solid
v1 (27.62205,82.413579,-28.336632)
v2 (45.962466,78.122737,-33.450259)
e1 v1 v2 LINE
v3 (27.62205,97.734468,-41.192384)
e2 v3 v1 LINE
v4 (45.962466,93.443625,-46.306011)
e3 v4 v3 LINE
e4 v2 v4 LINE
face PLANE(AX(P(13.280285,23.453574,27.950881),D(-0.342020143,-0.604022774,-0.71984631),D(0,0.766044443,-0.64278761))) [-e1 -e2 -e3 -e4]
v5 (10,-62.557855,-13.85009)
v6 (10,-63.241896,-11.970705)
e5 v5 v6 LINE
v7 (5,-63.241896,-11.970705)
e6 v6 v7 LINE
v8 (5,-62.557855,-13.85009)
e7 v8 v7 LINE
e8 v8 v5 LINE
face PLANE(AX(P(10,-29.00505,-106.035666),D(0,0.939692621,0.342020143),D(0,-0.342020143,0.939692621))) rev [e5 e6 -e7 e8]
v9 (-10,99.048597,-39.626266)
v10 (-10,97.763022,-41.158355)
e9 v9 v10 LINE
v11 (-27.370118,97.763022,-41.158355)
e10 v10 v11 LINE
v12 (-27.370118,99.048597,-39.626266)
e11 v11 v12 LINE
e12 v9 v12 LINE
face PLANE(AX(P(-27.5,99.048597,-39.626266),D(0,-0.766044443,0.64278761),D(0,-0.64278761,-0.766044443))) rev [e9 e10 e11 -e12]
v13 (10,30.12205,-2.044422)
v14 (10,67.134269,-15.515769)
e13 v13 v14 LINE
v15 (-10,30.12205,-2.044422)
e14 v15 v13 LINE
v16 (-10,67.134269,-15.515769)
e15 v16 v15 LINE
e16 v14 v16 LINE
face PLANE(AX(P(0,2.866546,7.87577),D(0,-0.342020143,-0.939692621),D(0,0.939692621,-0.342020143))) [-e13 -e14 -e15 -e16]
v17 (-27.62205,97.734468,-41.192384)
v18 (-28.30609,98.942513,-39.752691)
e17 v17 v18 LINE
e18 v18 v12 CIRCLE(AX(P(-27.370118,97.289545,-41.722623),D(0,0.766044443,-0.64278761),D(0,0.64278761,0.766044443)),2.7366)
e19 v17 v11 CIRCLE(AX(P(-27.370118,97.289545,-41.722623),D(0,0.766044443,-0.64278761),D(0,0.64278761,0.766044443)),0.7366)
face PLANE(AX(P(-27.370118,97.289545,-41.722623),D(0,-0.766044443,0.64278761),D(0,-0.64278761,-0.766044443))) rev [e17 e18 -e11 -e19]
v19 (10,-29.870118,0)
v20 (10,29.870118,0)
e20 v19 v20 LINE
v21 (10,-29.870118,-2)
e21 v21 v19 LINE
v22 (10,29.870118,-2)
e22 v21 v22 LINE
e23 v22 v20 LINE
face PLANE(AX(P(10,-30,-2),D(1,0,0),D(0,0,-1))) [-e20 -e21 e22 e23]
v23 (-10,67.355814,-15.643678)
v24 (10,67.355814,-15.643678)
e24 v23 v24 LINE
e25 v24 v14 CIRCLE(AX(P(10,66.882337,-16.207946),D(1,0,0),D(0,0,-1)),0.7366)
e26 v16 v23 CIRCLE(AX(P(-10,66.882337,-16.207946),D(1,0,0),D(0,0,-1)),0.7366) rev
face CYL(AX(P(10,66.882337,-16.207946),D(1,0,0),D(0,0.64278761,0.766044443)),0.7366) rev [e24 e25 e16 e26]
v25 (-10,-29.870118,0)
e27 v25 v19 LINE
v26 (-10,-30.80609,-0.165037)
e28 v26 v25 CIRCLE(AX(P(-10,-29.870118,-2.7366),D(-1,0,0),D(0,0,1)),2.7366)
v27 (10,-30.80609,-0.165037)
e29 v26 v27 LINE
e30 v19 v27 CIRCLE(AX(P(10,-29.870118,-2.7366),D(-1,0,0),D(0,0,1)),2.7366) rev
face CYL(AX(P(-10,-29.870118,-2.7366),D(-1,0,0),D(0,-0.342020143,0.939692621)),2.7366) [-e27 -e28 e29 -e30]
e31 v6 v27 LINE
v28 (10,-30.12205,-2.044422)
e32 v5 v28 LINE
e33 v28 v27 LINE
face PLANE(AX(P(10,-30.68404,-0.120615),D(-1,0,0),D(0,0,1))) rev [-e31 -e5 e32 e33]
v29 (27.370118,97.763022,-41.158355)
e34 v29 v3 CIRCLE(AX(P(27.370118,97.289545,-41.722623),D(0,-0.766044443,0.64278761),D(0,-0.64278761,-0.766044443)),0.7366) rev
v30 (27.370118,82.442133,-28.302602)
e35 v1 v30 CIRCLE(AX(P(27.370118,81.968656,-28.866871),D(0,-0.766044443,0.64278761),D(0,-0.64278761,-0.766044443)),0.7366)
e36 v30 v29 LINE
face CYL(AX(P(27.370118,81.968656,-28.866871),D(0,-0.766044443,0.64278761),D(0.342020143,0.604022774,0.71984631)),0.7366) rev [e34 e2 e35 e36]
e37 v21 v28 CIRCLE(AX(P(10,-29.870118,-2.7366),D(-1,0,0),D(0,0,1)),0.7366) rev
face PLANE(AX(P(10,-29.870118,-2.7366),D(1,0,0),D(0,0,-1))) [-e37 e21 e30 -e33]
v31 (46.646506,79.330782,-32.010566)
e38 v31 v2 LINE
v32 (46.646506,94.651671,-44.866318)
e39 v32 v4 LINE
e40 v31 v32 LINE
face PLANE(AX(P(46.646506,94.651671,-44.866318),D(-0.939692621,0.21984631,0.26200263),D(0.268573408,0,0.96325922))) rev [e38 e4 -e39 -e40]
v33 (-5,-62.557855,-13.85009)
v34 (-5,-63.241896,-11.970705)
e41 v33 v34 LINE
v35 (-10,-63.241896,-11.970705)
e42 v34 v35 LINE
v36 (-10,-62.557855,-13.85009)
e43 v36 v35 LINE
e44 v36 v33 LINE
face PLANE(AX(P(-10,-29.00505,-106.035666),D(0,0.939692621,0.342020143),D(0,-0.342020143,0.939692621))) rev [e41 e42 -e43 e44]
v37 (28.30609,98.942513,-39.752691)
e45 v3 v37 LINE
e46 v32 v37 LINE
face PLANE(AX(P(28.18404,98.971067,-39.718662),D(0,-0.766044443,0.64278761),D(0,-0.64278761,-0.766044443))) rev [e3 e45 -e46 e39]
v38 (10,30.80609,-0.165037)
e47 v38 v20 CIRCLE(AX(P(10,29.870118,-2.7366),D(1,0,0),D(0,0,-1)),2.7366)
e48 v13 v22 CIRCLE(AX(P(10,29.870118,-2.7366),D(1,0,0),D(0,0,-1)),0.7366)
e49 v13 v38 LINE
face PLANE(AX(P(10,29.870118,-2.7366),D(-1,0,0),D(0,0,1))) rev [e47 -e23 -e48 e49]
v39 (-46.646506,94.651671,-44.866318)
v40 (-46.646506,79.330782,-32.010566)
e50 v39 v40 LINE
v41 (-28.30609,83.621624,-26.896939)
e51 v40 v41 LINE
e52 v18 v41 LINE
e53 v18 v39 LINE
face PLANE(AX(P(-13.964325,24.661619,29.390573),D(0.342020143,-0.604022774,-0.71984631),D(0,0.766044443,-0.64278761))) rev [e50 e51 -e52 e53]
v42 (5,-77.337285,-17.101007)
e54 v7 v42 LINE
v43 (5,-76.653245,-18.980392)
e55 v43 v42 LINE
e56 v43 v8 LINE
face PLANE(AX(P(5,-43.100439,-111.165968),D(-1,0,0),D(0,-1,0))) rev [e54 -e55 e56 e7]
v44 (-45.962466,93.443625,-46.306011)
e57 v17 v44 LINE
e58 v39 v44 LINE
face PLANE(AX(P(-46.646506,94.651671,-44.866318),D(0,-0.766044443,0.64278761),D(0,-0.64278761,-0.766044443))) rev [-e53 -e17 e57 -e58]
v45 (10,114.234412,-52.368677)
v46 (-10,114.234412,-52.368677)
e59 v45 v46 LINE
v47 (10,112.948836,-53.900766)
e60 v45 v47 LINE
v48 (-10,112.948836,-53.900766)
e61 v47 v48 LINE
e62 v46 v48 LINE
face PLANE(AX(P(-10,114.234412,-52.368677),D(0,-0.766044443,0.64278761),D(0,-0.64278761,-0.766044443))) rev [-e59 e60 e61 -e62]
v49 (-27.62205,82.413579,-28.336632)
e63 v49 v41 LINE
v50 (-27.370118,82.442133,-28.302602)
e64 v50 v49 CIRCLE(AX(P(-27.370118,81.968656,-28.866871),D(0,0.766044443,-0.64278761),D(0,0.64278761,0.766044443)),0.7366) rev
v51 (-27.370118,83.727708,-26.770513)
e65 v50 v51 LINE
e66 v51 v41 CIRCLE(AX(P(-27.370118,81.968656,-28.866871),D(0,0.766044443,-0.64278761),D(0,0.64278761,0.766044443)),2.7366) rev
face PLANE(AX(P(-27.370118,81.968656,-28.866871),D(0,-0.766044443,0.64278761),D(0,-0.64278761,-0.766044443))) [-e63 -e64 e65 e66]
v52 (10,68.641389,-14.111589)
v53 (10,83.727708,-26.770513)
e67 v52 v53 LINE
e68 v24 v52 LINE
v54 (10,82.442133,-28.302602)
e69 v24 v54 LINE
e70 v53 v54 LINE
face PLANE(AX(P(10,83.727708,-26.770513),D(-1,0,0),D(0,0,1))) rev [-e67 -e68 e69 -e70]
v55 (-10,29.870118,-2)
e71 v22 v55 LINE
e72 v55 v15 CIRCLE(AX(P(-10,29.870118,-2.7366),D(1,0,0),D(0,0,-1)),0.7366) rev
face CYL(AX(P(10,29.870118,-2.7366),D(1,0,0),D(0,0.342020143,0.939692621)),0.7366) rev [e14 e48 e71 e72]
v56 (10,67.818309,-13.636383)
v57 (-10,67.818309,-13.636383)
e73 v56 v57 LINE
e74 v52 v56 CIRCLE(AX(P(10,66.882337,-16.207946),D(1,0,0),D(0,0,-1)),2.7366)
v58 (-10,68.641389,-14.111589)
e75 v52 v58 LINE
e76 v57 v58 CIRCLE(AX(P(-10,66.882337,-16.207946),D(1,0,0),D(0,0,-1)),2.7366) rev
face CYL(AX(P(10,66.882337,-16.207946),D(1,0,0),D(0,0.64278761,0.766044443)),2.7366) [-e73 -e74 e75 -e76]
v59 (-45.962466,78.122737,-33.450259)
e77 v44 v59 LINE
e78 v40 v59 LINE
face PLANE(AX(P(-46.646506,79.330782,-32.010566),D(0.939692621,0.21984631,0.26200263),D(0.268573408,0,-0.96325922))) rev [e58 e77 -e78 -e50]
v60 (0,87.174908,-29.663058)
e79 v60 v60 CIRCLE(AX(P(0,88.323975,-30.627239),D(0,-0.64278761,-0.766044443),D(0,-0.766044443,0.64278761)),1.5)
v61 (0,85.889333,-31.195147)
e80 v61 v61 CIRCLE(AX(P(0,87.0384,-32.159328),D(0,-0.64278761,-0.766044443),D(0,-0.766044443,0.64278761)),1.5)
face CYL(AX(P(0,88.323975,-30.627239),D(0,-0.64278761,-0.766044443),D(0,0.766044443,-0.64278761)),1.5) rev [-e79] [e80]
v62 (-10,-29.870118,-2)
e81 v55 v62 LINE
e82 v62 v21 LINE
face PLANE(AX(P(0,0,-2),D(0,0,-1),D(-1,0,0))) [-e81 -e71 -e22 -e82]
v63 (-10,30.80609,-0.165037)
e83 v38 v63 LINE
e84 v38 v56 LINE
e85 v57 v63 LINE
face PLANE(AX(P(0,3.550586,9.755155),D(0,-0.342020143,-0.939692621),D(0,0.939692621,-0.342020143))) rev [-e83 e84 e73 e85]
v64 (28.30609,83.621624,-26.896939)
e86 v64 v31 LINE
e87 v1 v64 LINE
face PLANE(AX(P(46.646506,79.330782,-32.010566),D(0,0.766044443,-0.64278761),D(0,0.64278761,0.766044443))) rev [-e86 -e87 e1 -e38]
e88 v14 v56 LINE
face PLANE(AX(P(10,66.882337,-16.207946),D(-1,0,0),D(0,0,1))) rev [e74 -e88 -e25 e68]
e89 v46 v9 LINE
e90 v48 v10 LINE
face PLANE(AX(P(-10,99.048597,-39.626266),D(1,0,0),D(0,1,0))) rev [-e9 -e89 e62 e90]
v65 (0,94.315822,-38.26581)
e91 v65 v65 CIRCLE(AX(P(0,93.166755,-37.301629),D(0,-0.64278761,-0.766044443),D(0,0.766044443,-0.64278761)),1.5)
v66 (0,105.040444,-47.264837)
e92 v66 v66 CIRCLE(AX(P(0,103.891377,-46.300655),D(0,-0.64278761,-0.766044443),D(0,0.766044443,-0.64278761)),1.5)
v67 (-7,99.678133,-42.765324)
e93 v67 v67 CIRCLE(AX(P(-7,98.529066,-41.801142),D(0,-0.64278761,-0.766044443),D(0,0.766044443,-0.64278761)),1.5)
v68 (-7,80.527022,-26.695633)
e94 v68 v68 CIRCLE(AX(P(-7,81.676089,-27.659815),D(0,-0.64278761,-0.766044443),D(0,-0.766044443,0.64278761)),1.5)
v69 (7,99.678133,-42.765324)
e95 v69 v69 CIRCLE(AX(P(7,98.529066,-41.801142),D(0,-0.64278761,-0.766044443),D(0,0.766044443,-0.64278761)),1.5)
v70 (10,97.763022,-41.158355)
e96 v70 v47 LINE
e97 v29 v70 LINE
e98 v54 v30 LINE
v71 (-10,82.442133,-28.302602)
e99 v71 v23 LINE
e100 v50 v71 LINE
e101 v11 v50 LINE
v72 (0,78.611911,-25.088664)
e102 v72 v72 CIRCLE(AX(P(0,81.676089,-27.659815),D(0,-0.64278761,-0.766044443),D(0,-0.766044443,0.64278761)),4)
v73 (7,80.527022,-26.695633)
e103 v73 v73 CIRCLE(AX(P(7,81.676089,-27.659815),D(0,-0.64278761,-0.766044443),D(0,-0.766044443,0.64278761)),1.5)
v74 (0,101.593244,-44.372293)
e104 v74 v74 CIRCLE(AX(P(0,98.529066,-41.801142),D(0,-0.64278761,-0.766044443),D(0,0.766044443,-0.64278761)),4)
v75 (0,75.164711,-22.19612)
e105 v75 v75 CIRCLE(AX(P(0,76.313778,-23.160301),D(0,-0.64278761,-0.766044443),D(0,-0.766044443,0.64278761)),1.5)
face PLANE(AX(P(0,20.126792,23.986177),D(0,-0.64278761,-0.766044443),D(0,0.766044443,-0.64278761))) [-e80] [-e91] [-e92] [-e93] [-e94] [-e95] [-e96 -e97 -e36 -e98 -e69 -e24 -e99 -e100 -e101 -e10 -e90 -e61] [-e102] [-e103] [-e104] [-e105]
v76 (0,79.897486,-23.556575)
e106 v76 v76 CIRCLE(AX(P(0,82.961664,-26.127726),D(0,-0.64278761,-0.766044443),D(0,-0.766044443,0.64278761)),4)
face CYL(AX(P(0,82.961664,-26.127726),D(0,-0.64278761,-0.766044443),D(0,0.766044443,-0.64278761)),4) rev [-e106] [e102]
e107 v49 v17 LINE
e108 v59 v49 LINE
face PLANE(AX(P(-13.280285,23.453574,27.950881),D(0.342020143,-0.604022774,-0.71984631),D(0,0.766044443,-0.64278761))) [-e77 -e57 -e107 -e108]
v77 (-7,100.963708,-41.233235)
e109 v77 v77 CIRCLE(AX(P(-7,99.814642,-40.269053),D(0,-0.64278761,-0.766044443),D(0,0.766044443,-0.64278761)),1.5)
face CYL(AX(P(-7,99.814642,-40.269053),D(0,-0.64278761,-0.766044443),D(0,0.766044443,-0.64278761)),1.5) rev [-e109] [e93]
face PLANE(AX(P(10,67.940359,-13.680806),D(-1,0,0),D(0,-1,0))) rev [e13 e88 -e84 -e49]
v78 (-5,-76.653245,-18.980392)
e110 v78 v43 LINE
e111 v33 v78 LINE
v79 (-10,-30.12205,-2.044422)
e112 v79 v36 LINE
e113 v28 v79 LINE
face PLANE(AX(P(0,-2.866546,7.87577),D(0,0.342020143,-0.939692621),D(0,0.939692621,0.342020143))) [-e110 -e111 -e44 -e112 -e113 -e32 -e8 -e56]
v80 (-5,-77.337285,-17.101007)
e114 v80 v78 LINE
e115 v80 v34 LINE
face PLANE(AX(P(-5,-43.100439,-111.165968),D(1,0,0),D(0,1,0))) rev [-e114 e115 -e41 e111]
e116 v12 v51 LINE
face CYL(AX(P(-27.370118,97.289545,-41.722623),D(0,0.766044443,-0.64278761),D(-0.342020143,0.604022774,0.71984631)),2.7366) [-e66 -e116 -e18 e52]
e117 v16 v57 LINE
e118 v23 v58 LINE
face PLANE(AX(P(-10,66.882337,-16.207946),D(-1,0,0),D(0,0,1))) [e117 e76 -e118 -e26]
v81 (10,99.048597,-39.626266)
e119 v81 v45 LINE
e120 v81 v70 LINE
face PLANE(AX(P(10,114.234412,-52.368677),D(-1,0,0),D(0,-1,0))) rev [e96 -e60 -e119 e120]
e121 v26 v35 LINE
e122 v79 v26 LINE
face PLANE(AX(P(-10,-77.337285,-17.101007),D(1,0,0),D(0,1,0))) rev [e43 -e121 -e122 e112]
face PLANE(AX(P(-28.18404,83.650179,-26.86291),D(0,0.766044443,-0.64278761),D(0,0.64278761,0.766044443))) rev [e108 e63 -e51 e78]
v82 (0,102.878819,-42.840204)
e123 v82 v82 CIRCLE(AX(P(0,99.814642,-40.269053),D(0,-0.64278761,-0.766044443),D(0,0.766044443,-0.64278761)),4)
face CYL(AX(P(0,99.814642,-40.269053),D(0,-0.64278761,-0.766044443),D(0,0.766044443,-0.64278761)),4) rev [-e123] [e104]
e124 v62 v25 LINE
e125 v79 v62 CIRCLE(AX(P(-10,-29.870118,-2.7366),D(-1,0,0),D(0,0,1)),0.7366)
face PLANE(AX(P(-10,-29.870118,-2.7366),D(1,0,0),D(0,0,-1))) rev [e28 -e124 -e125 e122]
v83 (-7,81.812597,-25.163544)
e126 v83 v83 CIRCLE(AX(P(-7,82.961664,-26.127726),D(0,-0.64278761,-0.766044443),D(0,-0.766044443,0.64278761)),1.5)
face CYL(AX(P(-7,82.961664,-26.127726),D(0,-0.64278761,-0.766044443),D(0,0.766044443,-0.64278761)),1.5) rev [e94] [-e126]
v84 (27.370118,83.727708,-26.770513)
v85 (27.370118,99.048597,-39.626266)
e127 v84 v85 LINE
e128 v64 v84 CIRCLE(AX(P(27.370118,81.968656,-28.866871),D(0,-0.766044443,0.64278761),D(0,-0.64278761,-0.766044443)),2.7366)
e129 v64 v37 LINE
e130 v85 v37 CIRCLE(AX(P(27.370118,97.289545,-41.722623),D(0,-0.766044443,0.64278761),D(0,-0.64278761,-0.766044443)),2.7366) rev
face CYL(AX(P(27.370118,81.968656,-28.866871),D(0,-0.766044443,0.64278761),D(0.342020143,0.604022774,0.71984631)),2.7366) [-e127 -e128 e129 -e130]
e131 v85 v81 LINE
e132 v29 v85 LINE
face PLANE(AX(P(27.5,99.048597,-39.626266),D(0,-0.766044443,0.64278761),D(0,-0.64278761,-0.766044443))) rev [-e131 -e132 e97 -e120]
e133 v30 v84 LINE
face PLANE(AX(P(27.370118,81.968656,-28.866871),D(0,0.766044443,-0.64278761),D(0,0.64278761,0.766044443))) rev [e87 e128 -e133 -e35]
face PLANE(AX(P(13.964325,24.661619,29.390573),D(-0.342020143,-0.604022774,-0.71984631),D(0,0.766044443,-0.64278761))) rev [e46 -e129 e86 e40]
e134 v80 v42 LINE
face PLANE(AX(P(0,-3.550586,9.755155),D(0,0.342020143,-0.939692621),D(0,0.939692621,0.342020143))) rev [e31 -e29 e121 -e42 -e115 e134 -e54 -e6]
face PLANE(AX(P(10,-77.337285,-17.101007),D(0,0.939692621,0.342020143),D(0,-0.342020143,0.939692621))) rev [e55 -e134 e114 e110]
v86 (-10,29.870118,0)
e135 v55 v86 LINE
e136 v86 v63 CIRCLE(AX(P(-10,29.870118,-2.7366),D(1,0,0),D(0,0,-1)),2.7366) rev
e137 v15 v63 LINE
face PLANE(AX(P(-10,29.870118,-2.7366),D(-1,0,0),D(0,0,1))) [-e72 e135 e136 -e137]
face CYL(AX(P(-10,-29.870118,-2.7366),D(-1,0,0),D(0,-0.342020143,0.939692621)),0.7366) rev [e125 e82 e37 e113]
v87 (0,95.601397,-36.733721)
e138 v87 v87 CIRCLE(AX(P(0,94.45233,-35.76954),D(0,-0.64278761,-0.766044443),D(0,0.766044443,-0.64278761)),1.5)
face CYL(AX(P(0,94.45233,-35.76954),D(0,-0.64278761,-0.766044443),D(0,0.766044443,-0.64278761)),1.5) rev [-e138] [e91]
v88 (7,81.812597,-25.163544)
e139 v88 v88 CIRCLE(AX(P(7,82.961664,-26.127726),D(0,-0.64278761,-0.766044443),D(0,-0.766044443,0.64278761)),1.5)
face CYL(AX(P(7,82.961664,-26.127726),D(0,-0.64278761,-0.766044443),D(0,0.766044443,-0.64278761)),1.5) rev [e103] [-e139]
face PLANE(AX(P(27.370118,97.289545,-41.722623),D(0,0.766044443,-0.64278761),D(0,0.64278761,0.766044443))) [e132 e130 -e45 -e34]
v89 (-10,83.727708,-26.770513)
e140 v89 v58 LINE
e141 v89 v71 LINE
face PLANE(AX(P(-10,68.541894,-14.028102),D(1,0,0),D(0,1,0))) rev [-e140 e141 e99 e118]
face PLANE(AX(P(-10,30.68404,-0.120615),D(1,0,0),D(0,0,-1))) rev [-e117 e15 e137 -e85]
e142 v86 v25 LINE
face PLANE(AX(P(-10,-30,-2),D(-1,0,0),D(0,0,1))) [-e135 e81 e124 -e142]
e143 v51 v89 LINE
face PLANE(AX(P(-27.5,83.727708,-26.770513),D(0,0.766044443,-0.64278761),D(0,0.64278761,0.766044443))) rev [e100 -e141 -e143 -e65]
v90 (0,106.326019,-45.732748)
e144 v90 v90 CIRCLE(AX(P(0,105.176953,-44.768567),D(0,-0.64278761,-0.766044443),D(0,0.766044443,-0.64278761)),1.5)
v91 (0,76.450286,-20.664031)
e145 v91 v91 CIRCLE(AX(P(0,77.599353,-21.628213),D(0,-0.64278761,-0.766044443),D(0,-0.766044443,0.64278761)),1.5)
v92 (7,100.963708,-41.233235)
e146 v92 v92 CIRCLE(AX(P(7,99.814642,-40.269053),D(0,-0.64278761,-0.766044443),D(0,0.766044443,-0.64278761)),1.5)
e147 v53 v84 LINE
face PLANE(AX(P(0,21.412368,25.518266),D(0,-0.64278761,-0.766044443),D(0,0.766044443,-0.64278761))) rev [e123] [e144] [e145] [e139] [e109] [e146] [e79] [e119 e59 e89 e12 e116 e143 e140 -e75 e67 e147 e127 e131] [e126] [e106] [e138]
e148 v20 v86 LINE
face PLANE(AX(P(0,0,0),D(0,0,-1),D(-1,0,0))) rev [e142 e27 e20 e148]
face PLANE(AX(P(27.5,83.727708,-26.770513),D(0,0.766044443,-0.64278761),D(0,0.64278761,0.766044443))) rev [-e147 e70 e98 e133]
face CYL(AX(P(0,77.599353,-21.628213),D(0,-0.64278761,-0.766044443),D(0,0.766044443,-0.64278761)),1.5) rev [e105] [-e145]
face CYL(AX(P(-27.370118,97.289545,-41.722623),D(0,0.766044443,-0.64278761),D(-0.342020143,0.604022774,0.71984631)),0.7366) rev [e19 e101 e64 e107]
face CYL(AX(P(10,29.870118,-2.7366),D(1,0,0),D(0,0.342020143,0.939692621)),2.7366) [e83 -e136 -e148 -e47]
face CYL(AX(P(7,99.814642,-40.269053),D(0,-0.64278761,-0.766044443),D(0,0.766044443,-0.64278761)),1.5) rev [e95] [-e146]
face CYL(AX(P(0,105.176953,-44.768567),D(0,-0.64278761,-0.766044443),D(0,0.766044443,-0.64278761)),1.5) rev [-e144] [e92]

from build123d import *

# Parameters (mm, degrees)
SKETCH1_W                      = 20
SKETCH1_H                      = 60
BASE_FLANGE1_DEPTH             = 2
EDGE_FLANGE1_STRIP_CUT_DEPTH   = 20
EDGE_FLANGE1_DEPTH             = 20
EDGE_FLANGE2_STRIP_CUT_DEPTH   = 20
EDGE_FLANGE2_DEPTH             = 20
EDGE_FLANGE3_STRIP_CUT_DEPTH   = 20
EDGE_FLANGE3_DEPTH             = 20
EDGE_FLANGE3_START             = 2
EDGE_FLANGE3_FLAT_DEPTH        = 2
EDGE_FLANGE4_STRIP_CUT_DEPTH   = 20
EDGE_FLANGE4_STRIP_CUT_2_DEPTH = 20
EDGE_FLANGE4_DEPTH             = 20
EDGE_FLANGE4_BEND_DEPTH        = 20
SKETCH16_W                     = 5
SKETCH16_H                     = 15
CUT_EXTRUDE2_DEPTH             = 142.77897769
SKETCH23_R                     = 4
SKETCH23_R_2                   = 1.5
CUT_EXTRUDE3_DEPTH             = 2


# Sheet-metal steps are written as plain solids
with BuildPart() as part:
    # Sketch1 → Base-Flange1 (new body)
    with BuildSketch(Plane.XY):
        Rectangle(SKETCH1_W, SKETCH1_H)
    extrude(amount=-BASE_FLANGE1_DEPTH)

    # Edge-Flange1 strip (across the edge) → Edge-Flange1 strip cut (cut)
    with BuildSketch(Plane(origin=(-10, 30, -2), x_dir=(0, -0.3420201433256631, -0.9396926207859105), z_dir=(1, 0, 0))):
        Polygon((-5.074988048, 8.095806265), (-1.834962826, -0.80608987), (0.044422416, -0.122049584), (-3.195602806, 8.779846552), align=None)
    extrude(amount=EDGE_FLANGE1_STRIP_CUT_DEPTH, mode=Mode.SUBTRACT)

    # Edge-Flange1 section (across the edge) → Edge-Flange1 (add)
    with BuildSketch(Plane(origin=(-10, 30, -2), x_dir=(0, -0.3420201433256631, -0.9396926207859105), z_dir=(1, 0, 0))):
        with BuildLine():
            Line((-2, 0.129882454), (-2, 39.647346039))
            Line((-2, 39.647346039), (0, 39.647346039))
            Line((0, 39.647346039), (0, 0.129882454))
            ThreePointArc((0, 0.129882454), (0.011190609, 0.001973206), (0.044422416, -0.122049584))
            Line((0.044422416, -0.122049584), (-1.834962826, -0.80608987))
            ThreePointArc((-1.834962826, -0.80608987), (-1.958424897, -0.345323149), (-2, 0.129882454))
        make_face()
    extrude(amount=EDGE_FLANGE1_DEPTH)

    # Edge-Flange2 strip (across the edge) → Edge-Flange2 strip cut (cut)
    with BuildSketch(Plane(origin=(10, -30, -2), x_dir=(0, 0.34202014332566344, -0.9396926207859103), z_dir=(-1, 0, 0))):
        Polygon((-5.074988048, 8.095806265), (-1.834962826, -0.80608987), (0.044422416, -0.122049584), (-3.195602806, 8.779846552), align=None)
    extrude(amount=EDGE_FLANGE2_STRIP_CUT_DEPTH, mode=Mode.SUBTRACT)

    # Edge-Flange2 section (across the edge) → Edge-Flange2 (add)
    with BuildSketch(Plane(origin=(10, -30, -2), x_dir=(0, 0.34202014332566344, -0.9396926207859103), z_dir=(-1, 0, 0))):
        with BuildLine():
            Line((-2, 0.129882454), (-2, 49.647346039))
            Line((-2, 49.647346039), (0, 49.647346039))
            Line((0, 49.647346039), (0, 0.129882454))
            ThreePointArc((0, 0.129882454), (0.011190609, 0.001973206), (0.044422416, -0.122049584))
            Line((0.044422416, -0.122049584), (-1.834962826, -0.80608987))
            ThreePointArc((-1.834962826, -0.80608987), (-1.958424897, -0.345323149), (-2, 0.129882454))
        make_face()
    extrude(amount=EDGE_FLANGE2_DEPTH)

    # Edge-Flange3 strip (across the edge) → Edge-Flange3 strip cut (cut)
    with BuildSketch(Plane(origin=(-10, 67.256318506, -15.560190975), x_dir=(0, -0.6427876096865303, -0.7660444431189858), z_dir=(1, 0, 0))):
        Polygon((-5.074988048, 8.095806265), (-1.834962826, -0.80608987), (0.044422416, -0.122049584), (-3.195602806, 8.779846552), align=None)
    extrude(amount=EDGE_FLANGE3_STRIP_CUT_DEPTH, mode=Mode.SUBTRACT)

    # Edge-Flange3 bend section (across the edge) → Edge-Flange3 (add)
    with BuildSketch(Plane(origin=(-10, 67.256318506, -15.560190975), x_dir=(0, -0.6427876096865303, -0.7660444431189858), z_dir=(1, 0, 0))):
        with BuildLine():
            Line((-2, 0.129882454), (0, 0.129882454))
            ThreePointArc((0, 0.129882454), (0.011190609, 0.001973206), (0.044422416, -0.122049584))
            Line((0.044422416, -0.122049584), (-1.834962826, -0.80608987))
            ThreePointArc((-1.834962826, -0.80608987), (-1.958424897, -0.345323149), (-2, 0.129882454))
        make_face()
    extrude(amount=EDGE_FLANGE3_DEPTH)

    # Edge-Flange3 profile (on flange) → Edge-Flange3 flat (add)
    with BuildSketch(Plane(origin=(0, 67.256318506, -15.560190975), x_dir=(1, 0, 0), z_dir=(0, 0.6427876096865303, 0.7660444431189858)).offset(EDGE_FLANGE3_START)):
        Polygon((10, 0.129882454), (10, 19.823673019), (27.5, 19.823673019), (27.5, 39.823673019), (10, 39.823673019), (10, 59.647346039), (-10, 59.647346039), (-10, 39.823673019), (-27.5, 39.823673019), (-27.5, 19.823673019), (-10, 19.823673019), (-10, 0.129882454), align=None)
    extrude(amount=-EDGE_FLANGE3_FLAT_DEPTH)

    # Edge-Flange4 strip (across the edge) → Edge-Flange4 strip cut (cut)
    with BuildSketch(Plane(origin=(27.5, 97.763021927, -41.158354564), x_dir=(-0.34202014332566383, -0.6040227735550463, -0.7198463103929629), z_dir=(0, -0.7660444431189858, 0.6427876096865304))):
        Polygon((-5.074988048, 8.095806265), (-1.834962826, -0.80608987), (0.044422416, -0.122049584), (-3.195602806, 8.779846552), align=None)
    extrude(amount=EDGE_FLANGE4_STRIP_CUT_DEPTH, mode=Mode.SUBTRACT)

    # Edge-Flange4 strip 2 (across the edge) → Edge-Flange4 strip cut 2 (cut)
    with BuildSketch(Plane(origin=(-27.5, 82.442133065, -28.30260237), x_dir=(0.3420201433256639, -0.6040227735550463, -0.7198463103929628), z_dir=(0, 0.7660444431189859, -0.6427876096865303))):
        Polygon((-5.074988048, 8.095806265), (-1.834962826, -0.80608987), (0.044422416, -0.122049584), (-3.195602806, 8.779846552), align=None)
    extrude(amount=EDGE_FLANGE4_STRIP_CUT_2_DEPTH, mode=Mode.SUBTRACT)

    # Edge-Flange4 section (across the edge) → Edge-Flange4 (add)
    with BuildSketch(Plane(origin=(27.5, 97.763021927, -41.158354564), x_dir=(-0.34202014332566383, -0.6040227735550463, -0.7198463103929629), z_dir=(0, -0.7660444431189858, 0.6427876096865304))):
        with BuildLine():
            Line((-2, 0.129882454), (-2, 19.647346039))
            Line((-2, 19.647346039), (0, 19.647346039))
            Line((0, 19.647346039), (0, 0.129882454))
            ThreePointArc((0, 0.129882454), (0.011190609, 0.001973206), (0.044422416, -0.122049584))
            Line((0.044422416, -0.122049584), (-1.834962826, -0.80608987))
            ThreePointArc((-1.834962826, -0.80608987), (-1.958424897, -0.345323149), (-2, 0.129882454))
        make_face()
    extrude(amount=EDGE_FLANGE4_DEPTH)

    # Edge-Flange4 section 2 (across the edge) → Edge-Flange4 bend (add)
    with BuildSketch(Plane(origin=(-27.5, 82.442133065, -28.30260237), x_dir=(0.3420201433256639, -0.6040227735550463, -0.7198463103929628), z_dir=(0, 0.7660444431189859, -0.6427876096865303))):
        with BuildLine():
            Line((-2, 0.129882454), (-2, 19.647346039))
            Line((-2, 19.647346039), (0, 19.647346039))
            Line((0, 19.647346039), (0, 0.129882454))
            ThreePointArc((0, 0.129882454), (0.011190609, 0.001973206), (0.044422416, -0.122049584))
            Line((0.044422416, -0.122049584), (-1.834962826, -0.80608987))
            ThreePointArc((-1.834962826, -0.80608987), (-1.958424897, -0.345323149), (-2, 0.129882454))
        make_face()
    extrude(amount=EDGE_FLANGE4_BEND_DEPTH)

    # Sketch16 → Cut-Extrude2 (cut, through all)
    with BuildSketch(Plane(origin=(0, -3.55058603, 9.755154944), x_dir=(1, 0, 0), z_dir=(0, -0.3420201433256634, 0.9396926207859103))):
        with Locations((-7.5, -71.022164949)):
            Rectangle(SKETCH16_W, SKETCH16_H)
        with Locations((7.5, -71.022164949)):
            Rectangle(SKETCH16_W, SKETCH16_H)
    extrude(amount=-CUT_EXTRUDE2_DEPTH, mode=Mode.SUBTRACT)

    # Sketch23 → Cut-Extrude3 (cut)
    with BuildSketch(Plane(origin=(0, 20.126792325, 23.986177061), x_dir=(-1, 0, 0), z_dir=(0, -0.6427876096865301, -0.7660444431189858))):
        with Locations(Location((0, 102.346900038, 0), (0, 0, 90))):
            Circle(SKETCH23_R)
        with Locations(Location((0, 109.346900038, 0), (0, 0, 90))):
            Circle(SKETCH23_R_2)
        with Locations(Location((7, 102.346900038, 0), (0, 0, 90))):
            Circle(SKETCH23_R_2)
        with Locations(Location((0, 95.346900038, 0), (0, 0, 90))):
            Circle(SKETCH23_R_2)
        with Locations(Location((-7, 102.346900038, 0), (0, 0, 90))):
            Circle(SKETCH23_R_2)
        with Locations(Location((-7, 80.346900038, 0), (0, 0, 270))):
            Circle(SKETCH23_R_2)
        with Locations(Location((7, 80.346900038, 0), (0, 0, 270))):
            Circle(SKETCH23_R_2)
        with Locations(Location((0, 80.346900038, 0), (0, 0, 270))):
            Circle(SKETCH23_R)
        with Locations(Location((0, 87.346900038, 0), (0, 0, 270))):
            Circle(SKETCH23_R_2)
        with Locations(Location((0, 73.346900038, 0), (0, 0, 270))):
            Circle(SKETCH23_R_2)
    extrude(amount=-CUT_EXTRUDE3_DEPTH, mode=Mode.SUBTRACT)


solid = part.part
